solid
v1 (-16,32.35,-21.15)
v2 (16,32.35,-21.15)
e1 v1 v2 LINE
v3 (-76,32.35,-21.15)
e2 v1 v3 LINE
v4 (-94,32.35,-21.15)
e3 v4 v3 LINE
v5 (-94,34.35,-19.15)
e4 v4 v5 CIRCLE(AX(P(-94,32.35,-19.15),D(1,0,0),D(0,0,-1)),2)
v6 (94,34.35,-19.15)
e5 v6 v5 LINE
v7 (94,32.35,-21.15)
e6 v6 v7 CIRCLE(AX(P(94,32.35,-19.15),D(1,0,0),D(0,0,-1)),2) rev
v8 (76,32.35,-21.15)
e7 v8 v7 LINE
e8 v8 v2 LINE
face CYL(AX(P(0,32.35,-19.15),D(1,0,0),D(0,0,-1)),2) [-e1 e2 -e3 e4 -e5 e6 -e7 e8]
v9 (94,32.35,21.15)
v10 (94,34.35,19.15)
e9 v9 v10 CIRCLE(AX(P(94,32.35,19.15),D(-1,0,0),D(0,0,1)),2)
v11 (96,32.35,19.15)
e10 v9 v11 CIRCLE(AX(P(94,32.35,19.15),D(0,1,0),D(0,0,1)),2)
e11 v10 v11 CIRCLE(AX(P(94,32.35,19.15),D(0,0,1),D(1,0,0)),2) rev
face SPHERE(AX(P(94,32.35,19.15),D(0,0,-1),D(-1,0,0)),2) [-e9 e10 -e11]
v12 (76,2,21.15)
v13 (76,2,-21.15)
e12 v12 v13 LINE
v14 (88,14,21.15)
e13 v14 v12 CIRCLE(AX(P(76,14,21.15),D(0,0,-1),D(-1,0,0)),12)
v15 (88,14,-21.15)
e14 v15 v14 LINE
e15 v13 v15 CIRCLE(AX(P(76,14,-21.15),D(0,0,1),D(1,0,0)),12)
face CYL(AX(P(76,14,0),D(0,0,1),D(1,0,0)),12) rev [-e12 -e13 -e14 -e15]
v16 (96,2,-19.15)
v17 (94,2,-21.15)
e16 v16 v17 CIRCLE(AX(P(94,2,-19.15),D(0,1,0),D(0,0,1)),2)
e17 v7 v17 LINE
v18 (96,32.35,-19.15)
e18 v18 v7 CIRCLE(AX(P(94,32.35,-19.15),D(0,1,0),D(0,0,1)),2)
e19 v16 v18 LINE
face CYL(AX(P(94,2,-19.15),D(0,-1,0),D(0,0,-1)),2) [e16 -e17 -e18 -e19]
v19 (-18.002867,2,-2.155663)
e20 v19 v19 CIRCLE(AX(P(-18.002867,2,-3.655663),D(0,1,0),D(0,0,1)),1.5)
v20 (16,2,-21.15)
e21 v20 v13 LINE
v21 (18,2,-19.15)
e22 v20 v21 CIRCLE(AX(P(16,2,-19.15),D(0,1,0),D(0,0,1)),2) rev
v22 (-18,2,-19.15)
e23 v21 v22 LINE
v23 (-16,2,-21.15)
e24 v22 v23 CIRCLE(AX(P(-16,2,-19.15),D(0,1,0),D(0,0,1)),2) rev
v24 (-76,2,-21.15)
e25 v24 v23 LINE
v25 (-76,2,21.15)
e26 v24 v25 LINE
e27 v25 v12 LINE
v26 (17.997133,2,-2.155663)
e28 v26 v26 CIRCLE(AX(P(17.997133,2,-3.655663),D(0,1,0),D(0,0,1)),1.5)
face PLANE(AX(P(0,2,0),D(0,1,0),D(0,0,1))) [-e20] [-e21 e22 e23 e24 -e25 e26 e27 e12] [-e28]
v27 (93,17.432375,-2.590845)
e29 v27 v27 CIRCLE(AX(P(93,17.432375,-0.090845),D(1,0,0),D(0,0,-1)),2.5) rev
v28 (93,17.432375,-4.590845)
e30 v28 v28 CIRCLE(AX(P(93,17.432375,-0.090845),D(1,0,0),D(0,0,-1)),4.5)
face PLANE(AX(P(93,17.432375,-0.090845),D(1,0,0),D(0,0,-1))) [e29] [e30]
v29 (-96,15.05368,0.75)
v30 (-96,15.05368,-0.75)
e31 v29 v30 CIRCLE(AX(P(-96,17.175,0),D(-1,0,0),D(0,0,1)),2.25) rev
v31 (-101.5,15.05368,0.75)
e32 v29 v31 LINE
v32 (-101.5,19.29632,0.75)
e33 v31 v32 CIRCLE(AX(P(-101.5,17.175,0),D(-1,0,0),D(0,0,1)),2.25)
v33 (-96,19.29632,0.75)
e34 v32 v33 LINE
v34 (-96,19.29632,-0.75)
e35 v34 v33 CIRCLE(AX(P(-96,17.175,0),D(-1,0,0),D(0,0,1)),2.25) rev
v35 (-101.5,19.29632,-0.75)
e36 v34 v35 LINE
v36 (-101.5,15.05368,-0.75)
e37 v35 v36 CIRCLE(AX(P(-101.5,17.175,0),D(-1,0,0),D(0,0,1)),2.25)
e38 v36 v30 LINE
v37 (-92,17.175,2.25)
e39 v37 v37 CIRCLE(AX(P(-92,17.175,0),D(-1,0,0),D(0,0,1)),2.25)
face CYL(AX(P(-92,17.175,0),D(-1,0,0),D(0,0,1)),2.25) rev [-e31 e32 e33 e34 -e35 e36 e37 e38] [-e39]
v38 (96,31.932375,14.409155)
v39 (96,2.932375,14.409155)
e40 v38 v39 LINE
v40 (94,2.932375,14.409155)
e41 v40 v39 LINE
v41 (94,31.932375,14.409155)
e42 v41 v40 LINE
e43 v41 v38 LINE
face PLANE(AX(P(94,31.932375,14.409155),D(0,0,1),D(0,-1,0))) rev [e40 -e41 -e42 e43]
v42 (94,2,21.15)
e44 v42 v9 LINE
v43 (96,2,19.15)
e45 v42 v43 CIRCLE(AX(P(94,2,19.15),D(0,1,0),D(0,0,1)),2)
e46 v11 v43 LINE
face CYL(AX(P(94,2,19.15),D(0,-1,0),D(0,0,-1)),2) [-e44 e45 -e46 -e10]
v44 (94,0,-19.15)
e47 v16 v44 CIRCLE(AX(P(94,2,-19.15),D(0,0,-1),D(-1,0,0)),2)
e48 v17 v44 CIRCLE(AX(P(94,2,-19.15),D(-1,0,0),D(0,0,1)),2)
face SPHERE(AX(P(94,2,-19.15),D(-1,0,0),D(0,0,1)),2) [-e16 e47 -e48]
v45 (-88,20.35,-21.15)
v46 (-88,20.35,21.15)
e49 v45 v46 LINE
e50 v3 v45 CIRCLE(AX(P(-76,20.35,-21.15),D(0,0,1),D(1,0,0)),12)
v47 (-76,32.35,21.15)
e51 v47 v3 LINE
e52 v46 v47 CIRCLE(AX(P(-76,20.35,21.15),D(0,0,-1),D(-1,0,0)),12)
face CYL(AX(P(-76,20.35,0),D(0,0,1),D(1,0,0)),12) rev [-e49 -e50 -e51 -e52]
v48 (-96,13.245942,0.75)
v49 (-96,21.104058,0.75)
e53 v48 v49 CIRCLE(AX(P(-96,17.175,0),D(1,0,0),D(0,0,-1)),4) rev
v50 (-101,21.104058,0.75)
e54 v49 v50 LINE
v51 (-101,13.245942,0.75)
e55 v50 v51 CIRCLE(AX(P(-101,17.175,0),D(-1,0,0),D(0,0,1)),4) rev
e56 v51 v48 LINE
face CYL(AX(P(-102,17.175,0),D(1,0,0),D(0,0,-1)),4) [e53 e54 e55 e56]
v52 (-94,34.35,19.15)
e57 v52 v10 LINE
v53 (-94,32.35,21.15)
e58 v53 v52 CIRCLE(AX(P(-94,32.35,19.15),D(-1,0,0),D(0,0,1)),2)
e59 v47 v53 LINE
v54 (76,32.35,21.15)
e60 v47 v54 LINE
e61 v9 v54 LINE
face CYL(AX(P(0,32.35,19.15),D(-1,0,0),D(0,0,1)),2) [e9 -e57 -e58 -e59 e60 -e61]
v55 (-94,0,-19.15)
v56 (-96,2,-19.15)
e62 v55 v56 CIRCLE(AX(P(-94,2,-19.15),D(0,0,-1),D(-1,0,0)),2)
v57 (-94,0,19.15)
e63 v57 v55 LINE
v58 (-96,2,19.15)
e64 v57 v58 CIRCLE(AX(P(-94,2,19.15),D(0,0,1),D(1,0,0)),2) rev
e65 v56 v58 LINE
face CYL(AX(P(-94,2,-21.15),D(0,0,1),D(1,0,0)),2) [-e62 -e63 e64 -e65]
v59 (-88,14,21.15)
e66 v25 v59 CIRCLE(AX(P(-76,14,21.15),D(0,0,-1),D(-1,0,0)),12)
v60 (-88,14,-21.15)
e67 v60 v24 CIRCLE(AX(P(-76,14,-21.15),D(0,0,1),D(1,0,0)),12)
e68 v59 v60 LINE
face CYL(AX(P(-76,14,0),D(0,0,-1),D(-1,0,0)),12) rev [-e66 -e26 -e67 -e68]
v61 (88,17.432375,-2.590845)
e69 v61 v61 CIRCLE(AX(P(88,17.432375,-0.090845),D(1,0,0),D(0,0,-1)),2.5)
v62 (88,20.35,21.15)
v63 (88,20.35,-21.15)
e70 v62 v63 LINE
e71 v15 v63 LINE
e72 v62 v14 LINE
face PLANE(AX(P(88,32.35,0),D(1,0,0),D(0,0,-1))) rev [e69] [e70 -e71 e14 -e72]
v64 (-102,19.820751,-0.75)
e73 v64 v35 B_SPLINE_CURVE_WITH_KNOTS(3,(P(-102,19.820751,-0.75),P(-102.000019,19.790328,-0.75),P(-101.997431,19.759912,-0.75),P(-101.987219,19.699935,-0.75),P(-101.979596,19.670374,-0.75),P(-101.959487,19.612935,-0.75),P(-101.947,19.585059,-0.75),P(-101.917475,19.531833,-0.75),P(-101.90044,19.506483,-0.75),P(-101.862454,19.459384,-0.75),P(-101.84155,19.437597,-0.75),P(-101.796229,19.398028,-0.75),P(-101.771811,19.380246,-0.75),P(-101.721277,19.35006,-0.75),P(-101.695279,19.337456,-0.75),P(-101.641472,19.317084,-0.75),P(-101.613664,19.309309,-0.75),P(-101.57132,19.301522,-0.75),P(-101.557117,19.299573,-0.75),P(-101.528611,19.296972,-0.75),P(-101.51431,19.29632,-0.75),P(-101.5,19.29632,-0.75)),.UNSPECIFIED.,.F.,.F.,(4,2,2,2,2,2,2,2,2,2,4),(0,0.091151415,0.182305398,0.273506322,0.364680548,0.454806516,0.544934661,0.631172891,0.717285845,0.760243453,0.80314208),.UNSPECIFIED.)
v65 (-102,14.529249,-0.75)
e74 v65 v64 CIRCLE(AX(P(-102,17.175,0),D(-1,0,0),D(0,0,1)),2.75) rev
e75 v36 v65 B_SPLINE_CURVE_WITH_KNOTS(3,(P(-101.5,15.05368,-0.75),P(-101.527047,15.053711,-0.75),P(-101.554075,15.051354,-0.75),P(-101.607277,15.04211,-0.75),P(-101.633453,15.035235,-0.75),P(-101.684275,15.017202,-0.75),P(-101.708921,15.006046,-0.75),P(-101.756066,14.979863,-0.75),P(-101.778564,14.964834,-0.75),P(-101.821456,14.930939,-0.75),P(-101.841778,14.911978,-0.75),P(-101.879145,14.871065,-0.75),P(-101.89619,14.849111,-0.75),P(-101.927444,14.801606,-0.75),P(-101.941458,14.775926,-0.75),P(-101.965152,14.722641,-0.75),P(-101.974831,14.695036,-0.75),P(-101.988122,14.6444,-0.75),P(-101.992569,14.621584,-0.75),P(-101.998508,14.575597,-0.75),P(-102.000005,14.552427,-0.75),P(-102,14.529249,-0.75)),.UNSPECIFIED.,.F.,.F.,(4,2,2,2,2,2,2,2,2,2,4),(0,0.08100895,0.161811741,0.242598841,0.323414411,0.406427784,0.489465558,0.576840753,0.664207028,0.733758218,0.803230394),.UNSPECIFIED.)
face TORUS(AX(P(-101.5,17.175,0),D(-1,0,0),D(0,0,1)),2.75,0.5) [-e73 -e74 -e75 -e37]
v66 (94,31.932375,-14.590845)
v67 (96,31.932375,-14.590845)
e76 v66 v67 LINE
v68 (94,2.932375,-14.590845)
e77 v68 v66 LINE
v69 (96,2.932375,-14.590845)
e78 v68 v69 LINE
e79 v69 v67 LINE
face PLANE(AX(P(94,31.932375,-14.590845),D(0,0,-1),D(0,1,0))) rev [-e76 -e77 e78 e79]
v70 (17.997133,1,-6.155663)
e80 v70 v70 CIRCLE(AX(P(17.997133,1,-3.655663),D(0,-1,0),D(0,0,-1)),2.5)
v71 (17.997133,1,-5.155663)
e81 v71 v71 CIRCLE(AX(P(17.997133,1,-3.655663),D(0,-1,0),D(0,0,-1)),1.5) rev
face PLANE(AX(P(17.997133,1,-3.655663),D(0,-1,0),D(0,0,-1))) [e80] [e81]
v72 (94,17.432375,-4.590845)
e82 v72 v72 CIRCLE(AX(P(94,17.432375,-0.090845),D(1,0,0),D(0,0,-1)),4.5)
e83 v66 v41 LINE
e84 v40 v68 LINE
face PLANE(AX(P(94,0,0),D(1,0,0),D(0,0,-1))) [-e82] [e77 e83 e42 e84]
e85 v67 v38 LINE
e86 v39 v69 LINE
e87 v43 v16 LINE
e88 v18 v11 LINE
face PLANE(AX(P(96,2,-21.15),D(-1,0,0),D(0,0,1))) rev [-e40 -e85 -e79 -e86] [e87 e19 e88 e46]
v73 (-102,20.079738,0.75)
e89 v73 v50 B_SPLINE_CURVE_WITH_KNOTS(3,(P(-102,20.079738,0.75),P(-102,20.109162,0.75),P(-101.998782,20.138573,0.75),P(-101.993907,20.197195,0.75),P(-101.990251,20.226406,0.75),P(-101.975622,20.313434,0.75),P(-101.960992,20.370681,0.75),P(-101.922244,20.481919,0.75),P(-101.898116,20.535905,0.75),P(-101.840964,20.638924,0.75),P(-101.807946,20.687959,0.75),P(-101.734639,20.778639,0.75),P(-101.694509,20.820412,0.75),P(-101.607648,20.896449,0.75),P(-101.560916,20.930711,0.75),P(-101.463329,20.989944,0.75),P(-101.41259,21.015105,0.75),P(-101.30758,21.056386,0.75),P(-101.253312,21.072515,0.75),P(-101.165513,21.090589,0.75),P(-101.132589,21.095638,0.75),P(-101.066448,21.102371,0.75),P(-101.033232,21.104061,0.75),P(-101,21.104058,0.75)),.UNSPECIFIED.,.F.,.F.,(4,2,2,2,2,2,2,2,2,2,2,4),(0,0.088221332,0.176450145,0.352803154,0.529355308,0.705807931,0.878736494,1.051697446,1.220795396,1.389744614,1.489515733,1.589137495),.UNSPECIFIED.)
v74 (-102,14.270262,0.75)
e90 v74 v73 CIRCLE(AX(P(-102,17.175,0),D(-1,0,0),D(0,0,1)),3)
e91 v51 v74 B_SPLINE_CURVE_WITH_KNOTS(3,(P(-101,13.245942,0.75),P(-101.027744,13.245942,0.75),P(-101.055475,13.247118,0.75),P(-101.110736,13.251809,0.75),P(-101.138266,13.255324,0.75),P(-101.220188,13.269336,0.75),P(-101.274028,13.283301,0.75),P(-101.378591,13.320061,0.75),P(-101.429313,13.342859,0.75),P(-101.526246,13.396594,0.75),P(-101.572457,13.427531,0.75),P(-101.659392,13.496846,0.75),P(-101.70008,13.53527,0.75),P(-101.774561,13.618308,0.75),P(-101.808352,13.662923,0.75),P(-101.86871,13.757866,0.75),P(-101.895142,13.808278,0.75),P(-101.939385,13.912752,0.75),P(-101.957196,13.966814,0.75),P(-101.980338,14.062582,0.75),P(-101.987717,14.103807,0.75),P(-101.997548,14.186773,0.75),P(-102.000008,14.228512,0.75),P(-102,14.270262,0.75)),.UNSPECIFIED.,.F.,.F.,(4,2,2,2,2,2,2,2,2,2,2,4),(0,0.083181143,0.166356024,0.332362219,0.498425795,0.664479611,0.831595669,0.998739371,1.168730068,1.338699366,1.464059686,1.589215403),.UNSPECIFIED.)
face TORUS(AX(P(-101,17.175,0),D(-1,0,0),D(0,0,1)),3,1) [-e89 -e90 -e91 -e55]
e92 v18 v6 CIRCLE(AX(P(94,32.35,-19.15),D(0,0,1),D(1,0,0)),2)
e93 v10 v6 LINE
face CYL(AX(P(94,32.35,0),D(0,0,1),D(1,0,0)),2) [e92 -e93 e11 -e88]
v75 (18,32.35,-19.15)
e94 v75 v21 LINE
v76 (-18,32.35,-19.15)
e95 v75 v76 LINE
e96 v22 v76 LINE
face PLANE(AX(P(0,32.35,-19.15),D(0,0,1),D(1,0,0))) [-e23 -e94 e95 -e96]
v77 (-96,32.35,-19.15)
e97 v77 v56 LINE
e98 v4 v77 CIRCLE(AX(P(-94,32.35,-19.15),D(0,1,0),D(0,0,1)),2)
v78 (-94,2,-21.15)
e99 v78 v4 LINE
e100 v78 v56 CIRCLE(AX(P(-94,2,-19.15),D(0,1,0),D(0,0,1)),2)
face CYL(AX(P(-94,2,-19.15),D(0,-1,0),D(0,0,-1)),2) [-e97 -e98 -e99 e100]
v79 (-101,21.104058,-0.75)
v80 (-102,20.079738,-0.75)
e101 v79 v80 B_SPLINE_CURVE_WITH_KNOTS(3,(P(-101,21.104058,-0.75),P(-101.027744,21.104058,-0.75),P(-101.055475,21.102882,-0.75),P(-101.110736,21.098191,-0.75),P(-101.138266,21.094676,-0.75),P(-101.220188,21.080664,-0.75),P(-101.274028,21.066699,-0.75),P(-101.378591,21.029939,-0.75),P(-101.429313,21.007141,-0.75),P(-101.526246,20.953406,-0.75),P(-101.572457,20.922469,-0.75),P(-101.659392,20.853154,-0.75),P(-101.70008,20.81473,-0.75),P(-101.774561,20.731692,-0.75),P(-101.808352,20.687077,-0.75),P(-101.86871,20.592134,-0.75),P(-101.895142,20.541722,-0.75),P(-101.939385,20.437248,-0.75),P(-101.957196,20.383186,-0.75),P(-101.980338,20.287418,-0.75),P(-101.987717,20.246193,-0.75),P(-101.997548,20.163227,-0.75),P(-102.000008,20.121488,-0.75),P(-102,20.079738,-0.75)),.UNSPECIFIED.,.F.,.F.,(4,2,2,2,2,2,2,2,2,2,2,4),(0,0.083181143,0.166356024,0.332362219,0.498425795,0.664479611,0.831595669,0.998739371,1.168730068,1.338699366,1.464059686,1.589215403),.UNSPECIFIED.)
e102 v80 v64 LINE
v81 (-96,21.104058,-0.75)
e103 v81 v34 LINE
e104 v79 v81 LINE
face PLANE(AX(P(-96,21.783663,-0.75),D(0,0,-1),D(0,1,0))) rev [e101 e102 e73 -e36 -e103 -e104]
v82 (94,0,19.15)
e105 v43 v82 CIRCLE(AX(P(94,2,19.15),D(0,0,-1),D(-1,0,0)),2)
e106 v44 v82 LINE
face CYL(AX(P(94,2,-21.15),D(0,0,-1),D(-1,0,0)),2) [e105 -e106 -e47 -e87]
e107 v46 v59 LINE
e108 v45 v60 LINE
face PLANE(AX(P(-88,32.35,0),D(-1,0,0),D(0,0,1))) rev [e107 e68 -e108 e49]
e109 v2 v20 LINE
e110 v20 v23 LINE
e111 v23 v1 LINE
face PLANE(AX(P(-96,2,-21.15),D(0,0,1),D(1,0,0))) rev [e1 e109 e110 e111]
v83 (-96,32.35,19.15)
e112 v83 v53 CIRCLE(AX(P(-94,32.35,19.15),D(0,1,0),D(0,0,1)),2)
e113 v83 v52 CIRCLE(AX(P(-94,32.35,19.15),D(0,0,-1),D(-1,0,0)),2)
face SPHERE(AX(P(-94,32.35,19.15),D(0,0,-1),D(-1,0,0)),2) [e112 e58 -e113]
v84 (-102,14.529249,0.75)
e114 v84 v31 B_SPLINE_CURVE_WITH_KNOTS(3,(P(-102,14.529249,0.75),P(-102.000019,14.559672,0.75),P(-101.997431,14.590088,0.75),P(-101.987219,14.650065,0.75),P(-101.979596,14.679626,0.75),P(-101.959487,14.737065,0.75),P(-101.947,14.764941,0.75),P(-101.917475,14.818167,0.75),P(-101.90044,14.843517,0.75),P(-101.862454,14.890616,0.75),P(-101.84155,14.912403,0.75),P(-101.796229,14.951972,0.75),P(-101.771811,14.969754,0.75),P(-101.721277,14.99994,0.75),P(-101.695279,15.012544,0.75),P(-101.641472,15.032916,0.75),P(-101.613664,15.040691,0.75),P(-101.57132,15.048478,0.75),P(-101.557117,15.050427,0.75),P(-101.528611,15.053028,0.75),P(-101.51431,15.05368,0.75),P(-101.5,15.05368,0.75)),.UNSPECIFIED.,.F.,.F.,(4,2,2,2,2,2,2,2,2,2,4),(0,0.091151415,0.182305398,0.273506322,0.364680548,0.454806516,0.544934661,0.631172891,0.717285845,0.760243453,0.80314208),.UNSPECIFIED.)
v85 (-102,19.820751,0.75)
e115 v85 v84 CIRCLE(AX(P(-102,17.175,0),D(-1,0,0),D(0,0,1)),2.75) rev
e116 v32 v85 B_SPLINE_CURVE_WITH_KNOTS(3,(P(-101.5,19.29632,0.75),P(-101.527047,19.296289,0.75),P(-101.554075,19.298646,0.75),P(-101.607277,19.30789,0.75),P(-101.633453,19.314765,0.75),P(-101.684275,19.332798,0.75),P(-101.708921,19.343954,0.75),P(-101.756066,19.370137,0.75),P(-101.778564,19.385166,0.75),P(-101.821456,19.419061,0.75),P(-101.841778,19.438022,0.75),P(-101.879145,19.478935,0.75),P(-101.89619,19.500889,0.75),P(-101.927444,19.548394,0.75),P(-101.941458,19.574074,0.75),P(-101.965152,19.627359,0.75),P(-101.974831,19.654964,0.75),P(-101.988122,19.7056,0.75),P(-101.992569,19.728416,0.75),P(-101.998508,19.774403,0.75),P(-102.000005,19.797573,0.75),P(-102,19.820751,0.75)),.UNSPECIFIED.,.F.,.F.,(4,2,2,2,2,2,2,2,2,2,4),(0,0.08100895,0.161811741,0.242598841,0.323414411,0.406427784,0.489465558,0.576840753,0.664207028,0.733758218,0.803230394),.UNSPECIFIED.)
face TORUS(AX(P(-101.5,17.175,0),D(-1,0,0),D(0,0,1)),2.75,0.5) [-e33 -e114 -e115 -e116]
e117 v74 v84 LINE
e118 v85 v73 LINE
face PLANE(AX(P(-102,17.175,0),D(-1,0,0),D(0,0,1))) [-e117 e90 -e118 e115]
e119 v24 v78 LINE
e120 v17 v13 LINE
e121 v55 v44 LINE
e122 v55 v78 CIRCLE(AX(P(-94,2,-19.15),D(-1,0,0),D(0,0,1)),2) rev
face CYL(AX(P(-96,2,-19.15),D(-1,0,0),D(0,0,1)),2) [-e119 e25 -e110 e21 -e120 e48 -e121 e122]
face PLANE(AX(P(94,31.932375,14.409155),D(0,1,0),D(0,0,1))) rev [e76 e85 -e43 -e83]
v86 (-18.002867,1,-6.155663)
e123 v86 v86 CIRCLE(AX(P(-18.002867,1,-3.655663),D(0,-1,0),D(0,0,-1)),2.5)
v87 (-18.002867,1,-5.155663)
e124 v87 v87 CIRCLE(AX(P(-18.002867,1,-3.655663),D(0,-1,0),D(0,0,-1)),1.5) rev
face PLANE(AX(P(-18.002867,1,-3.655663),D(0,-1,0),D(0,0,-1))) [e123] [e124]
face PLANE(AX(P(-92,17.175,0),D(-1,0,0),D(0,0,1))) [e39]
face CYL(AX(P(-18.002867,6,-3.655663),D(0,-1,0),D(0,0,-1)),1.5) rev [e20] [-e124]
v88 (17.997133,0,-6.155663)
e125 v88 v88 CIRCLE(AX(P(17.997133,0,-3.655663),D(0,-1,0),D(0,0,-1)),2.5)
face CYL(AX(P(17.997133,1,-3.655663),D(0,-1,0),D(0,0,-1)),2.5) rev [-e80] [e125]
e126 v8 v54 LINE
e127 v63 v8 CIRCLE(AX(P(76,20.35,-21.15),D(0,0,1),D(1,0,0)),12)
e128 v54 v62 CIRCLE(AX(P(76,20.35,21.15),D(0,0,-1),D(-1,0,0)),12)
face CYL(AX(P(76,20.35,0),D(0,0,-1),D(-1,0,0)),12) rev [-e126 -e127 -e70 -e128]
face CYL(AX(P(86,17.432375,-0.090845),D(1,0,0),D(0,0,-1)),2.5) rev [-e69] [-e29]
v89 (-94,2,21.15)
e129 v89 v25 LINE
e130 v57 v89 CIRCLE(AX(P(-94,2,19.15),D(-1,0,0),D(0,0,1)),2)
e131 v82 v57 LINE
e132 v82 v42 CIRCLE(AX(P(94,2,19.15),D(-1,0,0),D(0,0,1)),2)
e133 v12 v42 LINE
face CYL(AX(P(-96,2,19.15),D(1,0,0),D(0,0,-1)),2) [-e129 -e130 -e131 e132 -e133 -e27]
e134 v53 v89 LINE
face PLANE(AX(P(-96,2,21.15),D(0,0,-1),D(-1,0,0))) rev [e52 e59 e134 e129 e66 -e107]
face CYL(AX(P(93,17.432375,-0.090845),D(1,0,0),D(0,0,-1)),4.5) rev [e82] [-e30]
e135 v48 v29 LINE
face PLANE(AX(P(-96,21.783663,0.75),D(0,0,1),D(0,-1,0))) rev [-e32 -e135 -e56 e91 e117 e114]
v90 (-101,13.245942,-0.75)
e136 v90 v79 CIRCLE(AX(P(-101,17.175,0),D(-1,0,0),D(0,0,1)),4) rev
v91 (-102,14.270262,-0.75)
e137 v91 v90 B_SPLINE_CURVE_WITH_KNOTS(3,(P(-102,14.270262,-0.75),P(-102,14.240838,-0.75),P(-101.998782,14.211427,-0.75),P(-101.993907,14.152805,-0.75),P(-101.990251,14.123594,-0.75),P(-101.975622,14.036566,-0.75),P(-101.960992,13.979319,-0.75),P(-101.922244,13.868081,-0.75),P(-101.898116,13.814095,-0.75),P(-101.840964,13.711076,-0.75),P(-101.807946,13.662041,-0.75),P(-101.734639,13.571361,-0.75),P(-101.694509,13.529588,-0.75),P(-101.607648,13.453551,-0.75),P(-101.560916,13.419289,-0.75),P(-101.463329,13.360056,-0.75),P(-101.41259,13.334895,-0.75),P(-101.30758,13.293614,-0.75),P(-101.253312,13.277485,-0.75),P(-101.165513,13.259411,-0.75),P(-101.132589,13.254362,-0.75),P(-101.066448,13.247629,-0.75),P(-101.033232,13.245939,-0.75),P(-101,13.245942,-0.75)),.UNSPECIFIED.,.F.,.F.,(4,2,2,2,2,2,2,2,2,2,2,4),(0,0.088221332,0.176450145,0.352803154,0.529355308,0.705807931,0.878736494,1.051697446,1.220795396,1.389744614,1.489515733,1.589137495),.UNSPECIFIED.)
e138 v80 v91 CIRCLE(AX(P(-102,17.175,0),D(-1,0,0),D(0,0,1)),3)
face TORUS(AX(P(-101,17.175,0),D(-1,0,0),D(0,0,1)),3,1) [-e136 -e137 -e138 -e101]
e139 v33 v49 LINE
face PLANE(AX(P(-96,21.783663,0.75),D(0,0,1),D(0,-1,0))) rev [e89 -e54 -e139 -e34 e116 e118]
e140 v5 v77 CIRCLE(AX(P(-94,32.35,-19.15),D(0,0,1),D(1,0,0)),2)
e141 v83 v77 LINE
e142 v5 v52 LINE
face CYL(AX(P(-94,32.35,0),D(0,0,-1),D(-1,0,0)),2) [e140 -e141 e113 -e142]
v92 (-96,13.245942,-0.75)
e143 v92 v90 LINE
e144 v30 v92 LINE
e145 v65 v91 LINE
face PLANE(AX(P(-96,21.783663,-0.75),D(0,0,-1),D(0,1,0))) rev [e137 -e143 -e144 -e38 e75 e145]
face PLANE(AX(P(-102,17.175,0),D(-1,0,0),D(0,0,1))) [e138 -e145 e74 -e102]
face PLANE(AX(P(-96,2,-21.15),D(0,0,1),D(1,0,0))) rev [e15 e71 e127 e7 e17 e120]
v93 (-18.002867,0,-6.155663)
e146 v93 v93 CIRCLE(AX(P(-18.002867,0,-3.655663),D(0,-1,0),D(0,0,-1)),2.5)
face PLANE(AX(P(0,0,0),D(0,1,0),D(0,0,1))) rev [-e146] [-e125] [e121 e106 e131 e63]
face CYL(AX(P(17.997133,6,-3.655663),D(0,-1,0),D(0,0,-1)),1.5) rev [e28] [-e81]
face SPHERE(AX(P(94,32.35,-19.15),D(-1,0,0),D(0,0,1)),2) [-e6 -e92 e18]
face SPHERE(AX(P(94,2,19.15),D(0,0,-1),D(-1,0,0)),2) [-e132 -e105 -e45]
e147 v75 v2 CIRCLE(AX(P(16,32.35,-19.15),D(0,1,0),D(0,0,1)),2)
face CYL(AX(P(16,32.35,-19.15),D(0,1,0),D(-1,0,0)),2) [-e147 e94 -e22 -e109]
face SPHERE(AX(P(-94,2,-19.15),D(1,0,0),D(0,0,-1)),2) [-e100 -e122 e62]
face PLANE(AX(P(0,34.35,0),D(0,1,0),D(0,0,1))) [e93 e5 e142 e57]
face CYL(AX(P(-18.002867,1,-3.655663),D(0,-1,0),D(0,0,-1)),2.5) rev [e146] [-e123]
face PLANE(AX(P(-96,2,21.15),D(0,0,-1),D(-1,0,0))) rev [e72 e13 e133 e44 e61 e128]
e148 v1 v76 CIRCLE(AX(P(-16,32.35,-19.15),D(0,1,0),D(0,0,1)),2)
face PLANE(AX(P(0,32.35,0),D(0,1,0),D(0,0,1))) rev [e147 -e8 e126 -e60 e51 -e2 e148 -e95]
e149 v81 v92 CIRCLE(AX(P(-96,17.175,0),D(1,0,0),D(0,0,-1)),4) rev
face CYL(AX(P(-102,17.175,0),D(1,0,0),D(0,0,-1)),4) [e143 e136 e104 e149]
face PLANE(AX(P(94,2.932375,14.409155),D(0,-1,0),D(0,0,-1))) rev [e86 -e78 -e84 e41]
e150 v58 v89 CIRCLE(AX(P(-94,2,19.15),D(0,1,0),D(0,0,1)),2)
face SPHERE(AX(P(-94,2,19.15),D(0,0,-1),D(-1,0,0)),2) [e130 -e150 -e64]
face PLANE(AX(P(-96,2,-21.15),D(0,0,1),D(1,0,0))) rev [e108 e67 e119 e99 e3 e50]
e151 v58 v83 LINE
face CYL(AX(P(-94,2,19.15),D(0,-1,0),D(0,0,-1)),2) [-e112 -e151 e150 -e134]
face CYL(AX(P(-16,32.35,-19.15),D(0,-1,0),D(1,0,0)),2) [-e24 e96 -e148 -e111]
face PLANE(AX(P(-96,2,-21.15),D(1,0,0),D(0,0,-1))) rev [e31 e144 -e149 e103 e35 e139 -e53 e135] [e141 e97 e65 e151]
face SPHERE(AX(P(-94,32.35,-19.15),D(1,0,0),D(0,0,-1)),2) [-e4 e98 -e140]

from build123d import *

# Parameters (mm, degrees)
SKETCH1_W           = 192
SKETCH1_H           = 42.3
BOSS_EXTRUDE1_DEPTH = 2
SKETCH2_W           = 176
SKETCH2_H           = 2
BOSS_EXTRUDE2_DEPTH = 30.35
SKETCH3_W           = 192
SKETCH3_H           = 42.3
BOSS_EXTRUDE3_DEPTH = 2
FILLET1_R           = 12
FILLET2_R           = 12
FILLET3_R           = 12
FILLET4_R           = 12
CUT_EXTRUDE1_DEPTH  = 2
CUT_EXTRUDE2_DEPTH  = 2
SKETCH6_R           = 4
BOSS_EXTRUDE5_DEPTH = 6
SKETCH7_R           = 2.25
CUT_EXTRUDE3_DEPTH  = 10
SKETCH8_W           = 1.5
SKETCH8_H           = 9.217326718
CUT_EXTRUDE4_DEPTH  = 6
SKETCH10_R          = 1.5
CUT_EXTRUDE9_DEPTH  = 6
FILLET5_R           = 2
FILLET6_R           = 2
FILLET9_R           = 2
FILLET10_R          = 2
FILLET11_R          = 2
FILLET14_R          = 1
FILLET15_R          = 1
SKETCH11_R          = 2.5
CUT_EXTRUDE11_DEPTH = 1
SKETCH12_R          = 4.5
CUT_EXTRUDE12_DEPTH = 1
SKETCH13_R          = 2.5
CUT_EXTRUDE14_DEPTH = 10
SKETCH14_W          = 29
SKETCH14_H          = 29
CUT_EXTRUDE15_DEPTH = 2
SKETCH15_R          = 4.5
CUT_EXTRUDE16_DEPTH = 1
FILLET16_R          = 0.5
FILLET17_R          = 0.5
SKETCH16_W          = 8
SKETCH16_H          = 30.35
CUT_EXTRUDE17_DEPTH = 80
FILLET18_R          = 2
FILLET19_R          = 2


with BuildPart() as part:
    # Sketch1 → Boss-Extrude1 (new body)
    with BuildSketch(Plane(origin=(0, 0, 0), x_dir=(1, 0, 0), z_dir=(0, 1, 0))):
        Rectangle(SKETCH1_W, SKETCH1_H)
    extrude(amount=BOSS_EXTRUDE1_DEPTH)

    # Sketch2 → Boss-Extrude2 (add)
    with BuildSketch(Plane(origin=(0, 2, 0), x_dir=(1, 0, 0), z_dir=(0, 1, 0))):
        Polygon((-96, 21.15), (-96, -21.15), (-88, -21.15), (-88, 19.15), (-88, 21.15), align=None)
        with Locations((0, 20.15)):
            Rectangle(SKETCH2_W, SKETCH2_H)
        Polygon((88, 19.15), (88, -21.15), (96, -21.15), (96, 21.15), (88, 21.15), align=None)
    extrude(amount=BOSS_EXTRUDE2_DEPTH)

    # Sketch3 → Boss-Extrude3 (add)
    with BuildSketch(Plane(origin=(0, 32.35, 0), x_dir=(1, 0, 0), z_dir=(0, 1, 0))):
        Rectangle(SKETCH3_W, SKETCH3_H)
    extrude(amount=BOSS_EXTRUDE3_DEPTH)

    # Fillet1
    fillet1_edges = [part.edges().sort_by_distance(p)[0] for p in [
        (-88, 32.35, 1),
    ]]
    fillet(fillet1_edges, radius=FILLET1_R)

    # Fillet2
    fillet2_edges = [part.edges().sort_by_distance(p)[0] for p in [
        (-88, 2, 1),
    ]]
    fillet(fillet2_edges, radius=FILLET2_R)

    # Fillet3
    fillet3_edges = [part.edges().sort_by_distance(p)[0] for p in [
        (88, 32.35, 1),
    ]]
    fillet(fillet3_edges, radius=FILLET3_R)

    # Fillet4
    fillet4_edges = [part.edges().sort_by_distance(p)[0] for p in [
        (88, 2, 1),
    ]]
    fillet(fillet4_edges, radius=FILLET4_R)

    # Sketch4 → Cut-Extrude1 (cut)
    with BuildSketch(Plane.XY.offset(-19.15)):
        with BuildLine():
            Line((-76, 32.35), (-88, 20.35))
            ThreePointArc((-88, 20.35), (-84.485281374, 28.835281374), (-76, 32.35))
        make_face()
        with BuildLine():
            Line((-88, 14), (-76, 2))
            ThreePointArc((-76, 2), (-84.485281374, 5.514718626), (-88, 14))
        make_face()
        Polygon((-76, 32.35), (-88, 20.35), (-88, 14), (-76, 2), (-26, 2), (-26, 32.35), align=None)
    extrude(amount=-CUT_EXTRUDE1_DEPTH, mode=Mode.SUBTRACT)

    # Sketch5 → Cut-Extrude2 (cut)
    with BuildSketch(Plane.XY.offset(-19.15)):
        Polygon((88, 20.35), (76, 32.35), (26, 32.35), (26, 2), (76, 2), (88, 14), align=None)
        with BuildLine():
            Line((88, 20.35), (76, 32.35))
            ThreePointArc((76, 32.35), (84.485281374, 28.835281374), (88, 20.35))
        make_face()
        with BuildLine():
            Line((76, 2), (88, 14))
            ThreePointArc((88, 14), (84.485281374, 5.514718626), (76, 2))
        make_face()
    extrude(amount=-CUT_EXTRUDE2_DEPTH, mode=Mode.SUBTRACT)

    # Sketch6 → Boss-Extrude5 (add)
    with BuildSketch(Plane.ZY.offset(96)):
        with Locations(Location((0, 17.175, 0), (0, 0, 180))):
            Circle(SKETCH6_R)
    extrude(amount=BOSS_EXTRUDE5_DEPTH)

    # Sketch7 → Cut-Extrude3 (cut)
    with BuildSketch(Plane.ZY.offset(102)):
        with Locations((0, 17.175)):
            Circle(SKETCH7_R)
    extrude(amount=-CUT_EXTRUDE3_DEPTH, mode=Mode.SUBTRACT)

    # Sketch8 → Cut-Extrude4 (cut)
    with BuildSketch(Plane.ZY.offset(102)):
        with Locations((0, 17.175)):
            Rectangle(SKETCH8_W, SKETCH8_H)
    extrude(amount=-CUT_EXTRUDE4_DEPTH, mode=Mode.SUBTRACT)

    # Sketch10 → Cut-Extrude9 (cut)
    with BuildSketch(Plane.XZ):
        with Locations(Location((-18.002866527, -3.655663128, 0), (0, 0, 270))):
            Circle(SKETCH10_R)
        with Locations(Location((17.997133473, -3.655663128, 0), (0, 0, 270))):
            Circle(SKETCH10_R)
    extrude(amount=-CUT_EXTRUDE9_DEPTH, mode=Mode.SUBTRACT)

    # Fillet5
    fillet5_edges = [part.edges().sort_by_distance(p)[0] for p in [
        (0, 0, -21.15),
    ]]
    fillet(fillet5_edges, radius=FILLET5_R - 0.0001)  # a hair under: the kernel refuses the full size

    # Fillet6
    fillet6_edges = [part.edges().sort_by_distance(p)[0] for p in [
        (0, 34.35, -21.15),
    ]]
    fillet(fillet6_edges, radius=FILLET6_R - 0.0001)  # a hair under: the kernel refuses the full size

    # Fillet9
    fillet9_edges = [part.edges().sort_by_distance(p)[0] for p in [
        (96, 0.585757148, -20.564242852),
        (96, 17.175, -21.15),
        (96, 33.764242852, -20.564242852),
        (96, 34.35, 0.99995),
        (96, 0, 0.99995),
    ]]
    fillet(fillet9_edges, radius=FILLET9_R - 0.0001)  # a hair under: the kernel refuses the full size

    # Fillet10
    fillet10_edges = [part.edges().sort_by_distance(p)[0] for p in [
        (-96, 0, 0.99995),
        (-96, 0.585757148, -20.564242852),
        (-96, 34.35, 0.99995),
        (-96, 17.175, -21.15),
        (-96, 33.764242852, -20.564242852),
    ]]
    fillet(fillet10_edges, radius=FILLET10_R - 0.0001)  # a hair under: the kernel refuses the full size

    # Fillet11
    fillet11_edges = [part.edges().sort_by_distance(p)[0] for p in [
        (96, 17.175, 21.15),
        (95.414242852, 0.585757148, 21.15),
        (95.414242852, 33.764242852, 21.15),
        (0, 34.35, 21.15),
        (-96, 17.175, 21.15),
        (0, 0, 21.15),
        (-95.414242852, 0.585757148, 21.15),
        (-95.414242852, 33.764242852, 21.15),
    ]]
    fillet(fillet11_edges, radius=FILLET11_R - 0.0001)  # a hair under: the kernel refuses the full size

    # Fillet14
    fillet14_edges = [part.edges().sort_by_distance(p)[0] for p in [
        (-102, 17.175, 4),
    ]]
    fillet(fillet14_edges, radius=FILLET14_R)

    # Fillet15
    fillet15_edges = [part.edges().sort_by_distance(p)[0] for p in [
        (-102, 17.175, -4),
    ]]
    fillet(fillet15_edges, radius=FILLET15_R)

    # Sketch11 → Cut-Extrude11 (cut)
    with BuildSketch(Plane(origin=(0, 0, 0), x_dir=(-1, 0, 0), z_dir=(0, -1, 0))):
        with Locations(Location((18.002866527, 3.655663128, 0), (0, 0, 90))):
            Circle(SKETCH11_R)
        with Locations(Location((-17.997133473, 3.655663128, 0), (0, 0, 90))):
            Circle(SKETCH11_R)
    extrude(amount=-CUT_EXTRUDE11_DEPTH, mode=Mode.SUBTRACT)

    # Sketch12 → Cut-Extrude12 (cut)
    with BuildSketch(Plane(origin=(96, 0, 0), x_dir=(0, 0, -1), z_dir=(1, 0, 0))):
        with Locations((0.090844805, 17.432374702)):
            Circle(SKETCH12_R)
    extrude(amount=-CUT_EXTRUDE12_DEPTH, mode=Mode.SUBTRACT)

    # Sketch13 → Cut-Extrude14 (cut)
    with BuildSketch(Plane(origin=(96, 0, 0), x_dir=(0, 0, -1), z_dir=(1, 0, 0))):
        with Locations((0.090844805, 17.432374702)):
            Circle(SKETCH13_R)
    extrude(amount=-CUT_EXTRUDE14_DEPTH, mode=Mode.SUBTRACT)

    # Sketch14 → Cut-Extrude15 (cut)
    with BuildSketch(Plane(origin=(96, 0, 0), x_dir=(0, 0, -1), z_dir=(1, 0, 0))):
        with Locations((0.090844805, 17.432374702)):
            Rectangle(SKETCH14_W, SKETCH14_H)
    extrude(amount=-CUT_EXTRUDE15_DEPTH, mode=Mode.SUBTRACT)

    # Sketch15 → Cut-Extrude16 (cut)
    with BuildSketch(Plane(origin=(94, 0, 0), x_dir=(0, 0, -1), z_dir=(1, 0, 0))):
        with Locations((0.090844805, 17.432374702)):
            Circle(SKETCH15_R)
    extrude(amount=-CUT_EXTRUDE16_DEPTH, mode=Mode.SUBTRACT)

    # Fillet16
    fillet16_edges = [part.edges().sort_by_distance(p)[0] for p in [
        (-102, 18.474038106, 1.837117307),
    ]]
    fillet(fillet16_edges, radius=FILLET16_R)

    # Fillet17
    fillet17_edges = [part.edges().sort_by_distance(p)[0] for p in [
        (-102, 17.175, -2.25),
    ]]
    fillet(fillet17_edges, radius=FILLET17_R)

    # Sketch16 → Cut-Extrude17 (cut)
    with BuildSketch(Plane(origin=(0, 0, -21.15), x_dir=(-1, 0, 0), z_dir=(0, 0, -1))):
        with Locations((-22, 17.175)):
            Rectangle(SKETCH16_W, SKETCH16_H)
        with Locations((22, 17.175)):
            Rectangle(SKETCH16_W, SKETCH16_H)
    extrude(amount=-CUT_EXTRUDE17_DEPTH, mode=Mode.SUBTRACT)

    # Fillet18
    fillet18_edges = [part.edges().sort_by_distance(p)[0] for p in [
        (-18, 17.175, -21.15),
    ]]
    fillet(fillet18_edges, radius=FILLET18_R - 0.0001)  # a hair under: the kernel refuses the full size

    # Fillet19
    fillet19_edges = [part.edges().sort_by_distance(p)[0] for p in [
        (18, 17.175, -21.15),
    ]]
    fillet(fillet19_edges, radius=FILLET19_R - 0.0001)  # a hair under: the kernel refuses the full size


solid = part.part
